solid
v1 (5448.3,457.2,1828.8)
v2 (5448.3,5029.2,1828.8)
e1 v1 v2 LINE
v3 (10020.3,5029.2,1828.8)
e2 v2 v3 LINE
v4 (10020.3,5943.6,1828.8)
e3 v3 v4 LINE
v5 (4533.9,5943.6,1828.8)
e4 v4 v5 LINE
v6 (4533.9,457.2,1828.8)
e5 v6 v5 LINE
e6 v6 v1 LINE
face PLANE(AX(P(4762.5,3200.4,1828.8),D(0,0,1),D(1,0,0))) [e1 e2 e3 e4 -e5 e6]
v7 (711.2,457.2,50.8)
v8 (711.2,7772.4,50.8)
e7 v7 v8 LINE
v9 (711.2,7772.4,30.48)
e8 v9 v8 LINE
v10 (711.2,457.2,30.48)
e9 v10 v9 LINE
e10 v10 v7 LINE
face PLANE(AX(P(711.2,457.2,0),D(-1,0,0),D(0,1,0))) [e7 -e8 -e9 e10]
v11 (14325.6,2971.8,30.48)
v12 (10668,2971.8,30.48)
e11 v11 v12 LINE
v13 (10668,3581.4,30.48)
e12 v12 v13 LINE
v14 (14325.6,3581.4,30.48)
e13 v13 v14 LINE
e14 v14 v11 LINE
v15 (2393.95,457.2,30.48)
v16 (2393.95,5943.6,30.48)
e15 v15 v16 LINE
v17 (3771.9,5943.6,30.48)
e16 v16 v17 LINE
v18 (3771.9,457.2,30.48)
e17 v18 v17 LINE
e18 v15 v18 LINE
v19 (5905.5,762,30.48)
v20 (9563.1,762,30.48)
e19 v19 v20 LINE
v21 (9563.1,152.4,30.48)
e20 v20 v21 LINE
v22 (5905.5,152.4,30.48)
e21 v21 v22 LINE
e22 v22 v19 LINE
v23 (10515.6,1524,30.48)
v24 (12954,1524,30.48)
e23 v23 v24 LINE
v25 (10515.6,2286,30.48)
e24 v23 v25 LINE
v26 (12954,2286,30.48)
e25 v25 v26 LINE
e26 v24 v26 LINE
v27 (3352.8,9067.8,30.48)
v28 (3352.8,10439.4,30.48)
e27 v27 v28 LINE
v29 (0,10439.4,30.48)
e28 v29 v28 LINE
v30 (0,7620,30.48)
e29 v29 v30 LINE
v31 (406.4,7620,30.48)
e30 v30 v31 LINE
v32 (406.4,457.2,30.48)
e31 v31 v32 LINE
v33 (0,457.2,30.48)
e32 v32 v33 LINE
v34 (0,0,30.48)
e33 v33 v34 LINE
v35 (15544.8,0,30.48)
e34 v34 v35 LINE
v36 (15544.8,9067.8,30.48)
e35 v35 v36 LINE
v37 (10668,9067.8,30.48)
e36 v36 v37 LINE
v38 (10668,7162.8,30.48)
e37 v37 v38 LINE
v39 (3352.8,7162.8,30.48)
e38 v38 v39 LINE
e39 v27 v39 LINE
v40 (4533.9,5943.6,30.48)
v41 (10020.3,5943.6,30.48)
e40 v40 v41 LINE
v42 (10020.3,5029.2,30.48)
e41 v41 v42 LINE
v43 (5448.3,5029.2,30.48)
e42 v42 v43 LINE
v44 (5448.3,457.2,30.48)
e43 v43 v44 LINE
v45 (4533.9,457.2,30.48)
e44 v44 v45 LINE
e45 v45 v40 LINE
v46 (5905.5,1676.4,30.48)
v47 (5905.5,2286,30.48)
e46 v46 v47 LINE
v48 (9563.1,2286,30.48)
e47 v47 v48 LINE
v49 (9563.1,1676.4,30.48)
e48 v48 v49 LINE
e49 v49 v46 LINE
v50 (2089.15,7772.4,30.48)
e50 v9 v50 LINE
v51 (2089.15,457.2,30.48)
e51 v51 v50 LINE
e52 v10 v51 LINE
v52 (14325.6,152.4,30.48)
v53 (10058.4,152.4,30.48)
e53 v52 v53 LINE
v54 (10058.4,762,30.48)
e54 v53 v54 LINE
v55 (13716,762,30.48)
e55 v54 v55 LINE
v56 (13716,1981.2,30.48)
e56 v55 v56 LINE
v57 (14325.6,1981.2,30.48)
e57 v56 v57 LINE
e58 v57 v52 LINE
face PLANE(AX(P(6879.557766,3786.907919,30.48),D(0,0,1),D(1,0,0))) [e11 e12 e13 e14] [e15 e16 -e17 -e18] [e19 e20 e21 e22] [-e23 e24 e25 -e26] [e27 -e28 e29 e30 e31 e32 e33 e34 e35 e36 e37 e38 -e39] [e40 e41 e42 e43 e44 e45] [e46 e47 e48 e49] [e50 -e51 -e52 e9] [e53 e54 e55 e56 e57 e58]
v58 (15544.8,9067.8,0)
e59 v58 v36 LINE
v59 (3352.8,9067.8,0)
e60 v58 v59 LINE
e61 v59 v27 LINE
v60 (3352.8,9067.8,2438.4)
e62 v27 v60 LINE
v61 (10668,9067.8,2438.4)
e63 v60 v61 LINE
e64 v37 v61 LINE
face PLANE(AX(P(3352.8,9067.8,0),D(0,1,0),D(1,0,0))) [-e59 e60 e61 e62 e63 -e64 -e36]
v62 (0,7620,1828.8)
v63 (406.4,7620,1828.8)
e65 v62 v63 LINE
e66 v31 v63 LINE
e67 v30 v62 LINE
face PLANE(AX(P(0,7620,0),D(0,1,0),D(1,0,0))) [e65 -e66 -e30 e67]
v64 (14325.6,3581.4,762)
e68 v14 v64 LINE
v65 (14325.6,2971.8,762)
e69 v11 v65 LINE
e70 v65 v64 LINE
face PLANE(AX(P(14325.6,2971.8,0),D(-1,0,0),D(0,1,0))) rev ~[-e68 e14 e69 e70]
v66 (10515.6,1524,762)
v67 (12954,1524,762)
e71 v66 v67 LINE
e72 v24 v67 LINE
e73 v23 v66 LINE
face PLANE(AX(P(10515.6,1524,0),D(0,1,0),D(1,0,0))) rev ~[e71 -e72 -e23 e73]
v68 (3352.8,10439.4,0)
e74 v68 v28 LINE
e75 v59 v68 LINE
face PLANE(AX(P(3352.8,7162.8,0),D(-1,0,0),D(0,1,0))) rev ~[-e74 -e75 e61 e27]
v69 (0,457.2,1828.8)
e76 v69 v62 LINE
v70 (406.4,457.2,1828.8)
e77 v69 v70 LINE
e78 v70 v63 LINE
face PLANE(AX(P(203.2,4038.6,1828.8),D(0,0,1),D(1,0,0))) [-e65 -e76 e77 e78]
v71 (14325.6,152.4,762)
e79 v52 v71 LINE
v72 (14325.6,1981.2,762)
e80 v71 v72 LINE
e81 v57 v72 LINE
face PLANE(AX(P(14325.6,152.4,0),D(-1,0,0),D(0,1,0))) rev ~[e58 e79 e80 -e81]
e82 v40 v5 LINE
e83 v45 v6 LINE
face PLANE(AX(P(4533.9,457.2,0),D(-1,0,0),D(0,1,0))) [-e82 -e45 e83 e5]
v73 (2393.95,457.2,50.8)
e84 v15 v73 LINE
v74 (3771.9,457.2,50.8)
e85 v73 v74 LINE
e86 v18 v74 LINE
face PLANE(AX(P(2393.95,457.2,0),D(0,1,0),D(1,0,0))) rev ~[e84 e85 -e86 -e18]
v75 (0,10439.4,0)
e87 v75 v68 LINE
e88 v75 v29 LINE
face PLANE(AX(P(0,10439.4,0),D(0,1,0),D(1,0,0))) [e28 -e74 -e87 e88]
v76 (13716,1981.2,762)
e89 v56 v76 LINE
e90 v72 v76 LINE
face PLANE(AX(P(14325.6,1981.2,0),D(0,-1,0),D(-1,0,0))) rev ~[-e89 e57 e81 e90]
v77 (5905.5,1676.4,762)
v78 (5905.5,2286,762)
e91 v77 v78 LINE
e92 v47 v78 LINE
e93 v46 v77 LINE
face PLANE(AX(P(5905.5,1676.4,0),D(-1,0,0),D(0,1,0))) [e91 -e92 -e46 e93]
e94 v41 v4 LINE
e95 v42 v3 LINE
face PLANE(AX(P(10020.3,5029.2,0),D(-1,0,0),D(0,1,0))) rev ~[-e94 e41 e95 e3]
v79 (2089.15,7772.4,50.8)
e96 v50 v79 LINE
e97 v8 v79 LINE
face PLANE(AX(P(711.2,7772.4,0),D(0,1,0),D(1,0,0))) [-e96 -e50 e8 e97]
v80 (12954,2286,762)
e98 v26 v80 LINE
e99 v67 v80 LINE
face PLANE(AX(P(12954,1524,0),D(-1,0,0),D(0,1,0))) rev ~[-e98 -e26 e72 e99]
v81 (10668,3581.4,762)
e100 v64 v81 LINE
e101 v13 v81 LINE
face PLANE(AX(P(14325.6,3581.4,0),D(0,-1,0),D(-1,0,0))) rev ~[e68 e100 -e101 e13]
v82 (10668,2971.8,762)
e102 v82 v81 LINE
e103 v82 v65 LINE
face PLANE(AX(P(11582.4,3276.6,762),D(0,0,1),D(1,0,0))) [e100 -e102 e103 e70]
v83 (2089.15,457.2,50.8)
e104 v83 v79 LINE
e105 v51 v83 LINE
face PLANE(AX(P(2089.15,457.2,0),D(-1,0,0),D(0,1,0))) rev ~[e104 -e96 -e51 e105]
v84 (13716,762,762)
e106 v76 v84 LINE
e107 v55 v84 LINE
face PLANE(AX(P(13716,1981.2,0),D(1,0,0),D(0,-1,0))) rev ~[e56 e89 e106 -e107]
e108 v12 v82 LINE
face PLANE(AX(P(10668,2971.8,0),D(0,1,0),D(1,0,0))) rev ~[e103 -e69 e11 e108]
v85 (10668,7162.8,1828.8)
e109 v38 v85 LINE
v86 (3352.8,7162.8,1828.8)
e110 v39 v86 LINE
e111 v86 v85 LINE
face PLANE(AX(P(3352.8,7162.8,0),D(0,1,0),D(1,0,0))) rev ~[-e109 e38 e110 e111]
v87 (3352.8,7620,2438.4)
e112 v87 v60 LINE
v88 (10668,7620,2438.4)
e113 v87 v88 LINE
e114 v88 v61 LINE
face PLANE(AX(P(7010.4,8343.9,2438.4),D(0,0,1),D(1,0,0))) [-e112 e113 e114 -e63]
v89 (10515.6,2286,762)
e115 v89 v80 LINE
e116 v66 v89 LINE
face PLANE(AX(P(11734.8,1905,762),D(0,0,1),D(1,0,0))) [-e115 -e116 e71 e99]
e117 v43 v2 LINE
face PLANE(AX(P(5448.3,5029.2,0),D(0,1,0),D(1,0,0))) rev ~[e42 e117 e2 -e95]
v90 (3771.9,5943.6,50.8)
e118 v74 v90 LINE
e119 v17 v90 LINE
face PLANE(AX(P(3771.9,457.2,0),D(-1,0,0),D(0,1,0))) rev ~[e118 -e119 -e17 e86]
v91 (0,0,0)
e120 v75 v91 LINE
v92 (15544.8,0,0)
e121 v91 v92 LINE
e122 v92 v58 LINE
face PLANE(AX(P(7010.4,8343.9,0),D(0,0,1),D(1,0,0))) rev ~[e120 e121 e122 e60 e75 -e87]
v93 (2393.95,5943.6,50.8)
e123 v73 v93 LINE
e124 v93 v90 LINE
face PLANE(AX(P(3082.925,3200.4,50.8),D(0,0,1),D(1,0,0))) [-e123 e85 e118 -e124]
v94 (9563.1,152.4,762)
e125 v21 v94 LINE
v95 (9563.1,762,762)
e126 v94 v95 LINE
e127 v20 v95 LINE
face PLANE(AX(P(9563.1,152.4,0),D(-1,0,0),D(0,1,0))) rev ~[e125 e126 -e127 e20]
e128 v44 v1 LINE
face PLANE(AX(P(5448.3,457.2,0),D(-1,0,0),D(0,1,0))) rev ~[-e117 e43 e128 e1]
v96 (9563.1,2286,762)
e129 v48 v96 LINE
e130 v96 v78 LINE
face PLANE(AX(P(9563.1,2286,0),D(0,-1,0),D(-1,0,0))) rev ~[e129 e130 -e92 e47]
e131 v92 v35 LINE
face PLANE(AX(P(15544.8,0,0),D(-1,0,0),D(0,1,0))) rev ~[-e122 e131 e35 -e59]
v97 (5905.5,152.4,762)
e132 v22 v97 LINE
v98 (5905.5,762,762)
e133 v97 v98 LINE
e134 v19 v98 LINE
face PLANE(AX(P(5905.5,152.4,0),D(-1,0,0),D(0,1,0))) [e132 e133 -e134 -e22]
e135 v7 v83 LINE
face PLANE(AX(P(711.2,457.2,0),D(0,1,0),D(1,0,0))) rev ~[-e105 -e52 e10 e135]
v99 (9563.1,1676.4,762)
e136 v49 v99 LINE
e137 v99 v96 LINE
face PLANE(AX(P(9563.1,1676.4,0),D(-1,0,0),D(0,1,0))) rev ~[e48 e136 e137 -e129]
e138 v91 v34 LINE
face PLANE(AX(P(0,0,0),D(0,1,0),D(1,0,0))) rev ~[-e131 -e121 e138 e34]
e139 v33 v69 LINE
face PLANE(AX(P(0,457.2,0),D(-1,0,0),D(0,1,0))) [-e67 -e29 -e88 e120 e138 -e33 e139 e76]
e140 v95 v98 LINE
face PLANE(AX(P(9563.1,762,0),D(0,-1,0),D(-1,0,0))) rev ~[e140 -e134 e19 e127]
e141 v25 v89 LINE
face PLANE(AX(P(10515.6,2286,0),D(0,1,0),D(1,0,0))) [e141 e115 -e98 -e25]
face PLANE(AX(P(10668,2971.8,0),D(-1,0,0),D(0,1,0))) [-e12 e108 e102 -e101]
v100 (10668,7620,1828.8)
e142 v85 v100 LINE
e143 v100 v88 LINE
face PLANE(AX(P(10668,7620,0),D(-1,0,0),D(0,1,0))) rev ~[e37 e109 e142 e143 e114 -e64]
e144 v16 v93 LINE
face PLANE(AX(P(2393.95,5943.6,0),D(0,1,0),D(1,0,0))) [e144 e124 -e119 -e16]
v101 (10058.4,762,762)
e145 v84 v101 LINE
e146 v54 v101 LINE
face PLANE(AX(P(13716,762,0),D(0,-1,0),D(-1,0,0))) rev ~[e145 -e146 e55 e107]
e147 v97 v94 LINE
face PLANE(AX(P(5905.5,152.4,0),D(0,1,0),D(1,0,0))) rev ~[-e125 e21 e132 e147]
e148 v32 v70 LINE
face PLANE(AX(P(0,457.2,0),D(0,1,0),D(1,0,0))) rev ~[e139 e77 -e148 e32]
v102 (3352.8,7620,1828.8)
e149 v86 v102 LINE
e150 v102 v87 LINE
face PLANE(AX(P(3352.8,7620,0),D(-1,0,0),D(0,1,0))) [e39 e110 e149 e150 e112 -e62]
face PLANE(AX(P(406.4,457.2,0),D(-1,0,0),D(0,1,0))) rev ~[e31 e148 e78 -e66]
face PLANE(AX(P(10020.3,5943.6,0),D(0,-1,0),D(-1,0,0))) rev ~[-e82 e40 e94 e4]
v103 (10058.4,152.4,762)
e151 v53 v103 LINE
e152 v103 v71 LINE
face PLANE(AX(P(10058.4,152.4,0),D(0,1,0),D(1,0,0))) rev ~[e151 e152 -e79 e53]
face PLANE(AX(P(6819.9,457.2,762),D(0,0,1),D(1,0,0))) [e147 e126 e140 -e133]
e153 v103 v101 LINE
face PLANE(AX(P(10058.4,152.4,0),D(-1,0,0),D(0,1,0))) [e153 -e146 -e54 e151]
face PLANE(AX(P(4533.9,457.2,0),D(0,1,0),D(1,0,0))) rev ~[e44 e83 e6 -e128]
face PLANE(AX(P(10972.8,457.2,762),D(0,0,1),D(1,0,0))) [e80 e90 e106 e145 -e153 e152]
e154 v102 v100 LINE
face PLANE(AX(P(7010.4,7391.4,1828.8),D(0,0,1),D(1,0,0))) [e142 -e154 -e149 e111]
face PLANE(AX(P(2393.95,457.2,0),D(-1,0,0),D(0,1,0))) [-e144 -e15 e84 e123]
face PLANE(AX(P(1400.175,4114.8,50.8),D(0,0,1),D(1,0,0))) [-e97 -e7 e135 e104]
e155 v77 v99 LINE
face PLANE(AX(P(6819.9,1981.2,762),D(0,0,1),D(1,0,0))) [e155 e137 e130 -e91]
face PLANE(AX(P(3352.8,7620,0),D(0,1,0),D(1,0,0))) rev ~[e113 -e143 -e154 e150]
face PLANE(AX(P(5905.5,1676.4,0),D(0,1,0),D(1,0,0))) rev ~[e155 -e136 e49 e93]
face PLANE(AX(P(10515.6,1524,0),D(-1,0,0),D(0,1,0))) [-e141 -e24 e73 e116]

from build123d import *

# Parameters (mm, degrees)
F0_W     = 1377.95
F0_H     = 5486.4
F0_H_2   = 7315.2
F0_W_2   = 2438.4
F0_H_3   = 762
F0_W_3   = 3352.8
F0_H_4   = 1371.6
F0_W_4   = 914.4
F0_H_5   = 2438.4
F1_DEPTH = 30.48
F0_W_5   = 406.4
F0_H_6   = 7162.8
F0_W_6   = 7315.2
F0_H_7   = 457.2
F2_DEPTH = 1828.8
F0_W_7   = 1828.8
F0_H_8   = 609.6
F3_DEPTH = 762
F0_H_9   = 1447.8
F4_DEPTH = 2438.4
F6_DEPTH = 50.8
F0_W_8   = 457.2
F0_W_9   = 4572
F0_H_10  = 914.4
F7_DEPTH = 1828.8


# Not quite as in the source:
# - the program builds the solid bodies; features that only make, move or delete a surface that nothing else refers to are left out


with BuildPart() as f1:
    # F0 (on Top) → F1 (new body)
    with BuildSketch(Plane.XY):
        Polygon((3352.8, 9067.8), (0, 9067.8), (0, 7620), (406.4, 7620), (406.4, 457.2), (0, 457.2), (0, 0), (914.4, 0), (2438.4, 0), (5486.4, 0), (7010.4, 0), (13106.4, 0), (14630.4, 0), (14630.4, 2438.4), (15544.8, 2438.4), (15544.8, 3886.2), (10668, 3886.2), (10668, 7162.8), (3352.8, 7162.8), (3352.8, 7620), align=None)
        Polygon((5905.5, 1676.4), (5905.5, 2286), (7734.3, 2286), (9563.1, 2286), (9563.1, 1676.4), (9563.1, 762), (9563.1, 152.4), (7734.3, 152.4), (5905.5, 152.4), (5905.5, 762), align=None, mode=Mode.SUBTRACT)
        with Locations((3082.925, 3200.4)):
            Rectangle(F0_W, F0_H, mode=Mode.SUBTRACT)
        with Locations((1400.175, 4114.8)):
            Rectangle(F0_W, F0_H_2, mode=Mode.SUBTRACT)
        Polygon((4533.9, 457.2), (4533.9, 5943.6), (4991.1, 5943.6), (5448.3, 5943.6), (10020.3, 5943.6), (10020.3, 5029.2), (5448.3, 5029.2), (5448.3, 457.2), (4991.1, 457.2), align=None, mode=Mode.SUBTRACT)
        Polygon((12496.8, 3581.4), (14325.6, 3581.4), (14325.6, 2971.8), (14325.6, 1981.2), (14325.6, 152.4), (13716, 152.4), (11887.2, 152.4), (10058.4, 152.4), (9867.9, 152.4), (9867.9, 3581.4), (10668, 3581.4), align=None, mode=Mode.SUBTRACT)
        Polygon((14325.6, 1981.2), (14325.6, 2971.8), (12496.8, 2971.8), (10668, 2971.8), (10668, 3581.4), (9867.9, 3581.4), (9867.9, 152.4), (10058.4, 152.4), (10058.4, 762), (11887.2, 762), (13716, 762), (13716, 1981.2), align=None)
        with Locations((11734.8, 1905)):
            Rectangle(F0_W_2, F0_H_3, mode=Mode.SUBTRACT)
        Polygon((7734.3, 1676.4), (5905.5, 1676.4), (5905.5, 762), (7734.3, 762), (9563.1, 762), (9563.1, 1676.4), align=None)
        with Locations((1676.4, 9753.6)):
            Rectangle(F0_W_3, F0_H_4)
        Polygon((15544.8, 9067.8), (10668, 9067.8), (10668, 7620), (10668, 7162.8), (10668, 3886.2), (15544.8, 3886.2), align=None)
        with Locations((15087.6, 1219.2)):
            Rectangle(F0_W_4, F0_H_5)
    extrude(amount=F1_DEPTH)

    # F0 (on Top) → F2 (join)
    with BuildSketch(Plane.XY):
        with Locations((203.2, 4038.6)):
            Rectangle(F0_W_5, F0_H_6)
        with Locations((7010.4, 7391.4)):
            Rectangle(F0_W_6, F0_H_7)
    extrude(amount=F2_DEPTH)

    # F0 (on Top) → F3 (join)
    with BuildSketch(Plane.XY):
        with Locations((6819.9, 1981.2)):
            Rectangle(F0_W_7, F0_H_8)
        with Locations((8648.7, 1981.2)):
            Rectangle(F0_W_7, F0_H_8)
        with Locations((6819.9, 457.2)):
            Rectangle(F0_W_7, F0_H_8)
        with Locations((8648.7, 457.2)):
            Rectangle(F0_W_7, F0_H_8)
        with Locations((10972.8, 457.2)):
            Rectangle(F0_W_7, F0_H_8)
        with Locations((12801.6, 457.2)):
            Rectangle(F0_W_7, F0_H_8)
        Polygon((14325.6, 152.4), (14325.6, 1981.2), (13716, 1981.2), (13716, 762), (13716, 152.4), align=None)
        with Locations((11734.8, 1905)):
            Rectangle(F0_W_2, F0_H_3)
        with Locations((11582.4, 3276.6)):
            Rectangle(F0_W_7, F0_H_8)
        with Locations((13411.2, 3276.6)):
            Rectangle(F0_W_7, F0_H_8)
    extrude(amount=F3_DEPTH)

    # F0 (on Top) → F4 (join)
    with BuildSketch(Plane.XY):
        with Locations((7010.4, 8343.9)):
            Rectangle(F0_W_6, F0_H_9)
    extrude(amount=F4_DEPTH)

    # F0 (on Top) → F6 (join)
    with BuildSketch(Plane.XY):
        with Locations((1400.175, 4114.8)):
            Rectangle(F0_W, F0_H_2)
        with Locations((3082.925, 3200.4)):
            Rectangle(F0_W, F0_H)
    extrude(amount=F6_DEPTH)

    # F0 (on Top) → F7 (join)
    with BuildSketch(Plane.XY):
        with Locations((4762.5, 3200.4)):
            Rectangle(F0_W_8, F0_H)
        Polygon((5448.3, 5943.6), (4991.1, 5943.6), (4991.1, 457.2), (5448.3, 457.2), (5448.3, 5029.2), align=None)
        with Locations((7734.3, 5486.4)):
            Rectangle(F0_W_9, F0_H_10)
    extrude(amount=F7_DEPTH)


solid = f1.part
